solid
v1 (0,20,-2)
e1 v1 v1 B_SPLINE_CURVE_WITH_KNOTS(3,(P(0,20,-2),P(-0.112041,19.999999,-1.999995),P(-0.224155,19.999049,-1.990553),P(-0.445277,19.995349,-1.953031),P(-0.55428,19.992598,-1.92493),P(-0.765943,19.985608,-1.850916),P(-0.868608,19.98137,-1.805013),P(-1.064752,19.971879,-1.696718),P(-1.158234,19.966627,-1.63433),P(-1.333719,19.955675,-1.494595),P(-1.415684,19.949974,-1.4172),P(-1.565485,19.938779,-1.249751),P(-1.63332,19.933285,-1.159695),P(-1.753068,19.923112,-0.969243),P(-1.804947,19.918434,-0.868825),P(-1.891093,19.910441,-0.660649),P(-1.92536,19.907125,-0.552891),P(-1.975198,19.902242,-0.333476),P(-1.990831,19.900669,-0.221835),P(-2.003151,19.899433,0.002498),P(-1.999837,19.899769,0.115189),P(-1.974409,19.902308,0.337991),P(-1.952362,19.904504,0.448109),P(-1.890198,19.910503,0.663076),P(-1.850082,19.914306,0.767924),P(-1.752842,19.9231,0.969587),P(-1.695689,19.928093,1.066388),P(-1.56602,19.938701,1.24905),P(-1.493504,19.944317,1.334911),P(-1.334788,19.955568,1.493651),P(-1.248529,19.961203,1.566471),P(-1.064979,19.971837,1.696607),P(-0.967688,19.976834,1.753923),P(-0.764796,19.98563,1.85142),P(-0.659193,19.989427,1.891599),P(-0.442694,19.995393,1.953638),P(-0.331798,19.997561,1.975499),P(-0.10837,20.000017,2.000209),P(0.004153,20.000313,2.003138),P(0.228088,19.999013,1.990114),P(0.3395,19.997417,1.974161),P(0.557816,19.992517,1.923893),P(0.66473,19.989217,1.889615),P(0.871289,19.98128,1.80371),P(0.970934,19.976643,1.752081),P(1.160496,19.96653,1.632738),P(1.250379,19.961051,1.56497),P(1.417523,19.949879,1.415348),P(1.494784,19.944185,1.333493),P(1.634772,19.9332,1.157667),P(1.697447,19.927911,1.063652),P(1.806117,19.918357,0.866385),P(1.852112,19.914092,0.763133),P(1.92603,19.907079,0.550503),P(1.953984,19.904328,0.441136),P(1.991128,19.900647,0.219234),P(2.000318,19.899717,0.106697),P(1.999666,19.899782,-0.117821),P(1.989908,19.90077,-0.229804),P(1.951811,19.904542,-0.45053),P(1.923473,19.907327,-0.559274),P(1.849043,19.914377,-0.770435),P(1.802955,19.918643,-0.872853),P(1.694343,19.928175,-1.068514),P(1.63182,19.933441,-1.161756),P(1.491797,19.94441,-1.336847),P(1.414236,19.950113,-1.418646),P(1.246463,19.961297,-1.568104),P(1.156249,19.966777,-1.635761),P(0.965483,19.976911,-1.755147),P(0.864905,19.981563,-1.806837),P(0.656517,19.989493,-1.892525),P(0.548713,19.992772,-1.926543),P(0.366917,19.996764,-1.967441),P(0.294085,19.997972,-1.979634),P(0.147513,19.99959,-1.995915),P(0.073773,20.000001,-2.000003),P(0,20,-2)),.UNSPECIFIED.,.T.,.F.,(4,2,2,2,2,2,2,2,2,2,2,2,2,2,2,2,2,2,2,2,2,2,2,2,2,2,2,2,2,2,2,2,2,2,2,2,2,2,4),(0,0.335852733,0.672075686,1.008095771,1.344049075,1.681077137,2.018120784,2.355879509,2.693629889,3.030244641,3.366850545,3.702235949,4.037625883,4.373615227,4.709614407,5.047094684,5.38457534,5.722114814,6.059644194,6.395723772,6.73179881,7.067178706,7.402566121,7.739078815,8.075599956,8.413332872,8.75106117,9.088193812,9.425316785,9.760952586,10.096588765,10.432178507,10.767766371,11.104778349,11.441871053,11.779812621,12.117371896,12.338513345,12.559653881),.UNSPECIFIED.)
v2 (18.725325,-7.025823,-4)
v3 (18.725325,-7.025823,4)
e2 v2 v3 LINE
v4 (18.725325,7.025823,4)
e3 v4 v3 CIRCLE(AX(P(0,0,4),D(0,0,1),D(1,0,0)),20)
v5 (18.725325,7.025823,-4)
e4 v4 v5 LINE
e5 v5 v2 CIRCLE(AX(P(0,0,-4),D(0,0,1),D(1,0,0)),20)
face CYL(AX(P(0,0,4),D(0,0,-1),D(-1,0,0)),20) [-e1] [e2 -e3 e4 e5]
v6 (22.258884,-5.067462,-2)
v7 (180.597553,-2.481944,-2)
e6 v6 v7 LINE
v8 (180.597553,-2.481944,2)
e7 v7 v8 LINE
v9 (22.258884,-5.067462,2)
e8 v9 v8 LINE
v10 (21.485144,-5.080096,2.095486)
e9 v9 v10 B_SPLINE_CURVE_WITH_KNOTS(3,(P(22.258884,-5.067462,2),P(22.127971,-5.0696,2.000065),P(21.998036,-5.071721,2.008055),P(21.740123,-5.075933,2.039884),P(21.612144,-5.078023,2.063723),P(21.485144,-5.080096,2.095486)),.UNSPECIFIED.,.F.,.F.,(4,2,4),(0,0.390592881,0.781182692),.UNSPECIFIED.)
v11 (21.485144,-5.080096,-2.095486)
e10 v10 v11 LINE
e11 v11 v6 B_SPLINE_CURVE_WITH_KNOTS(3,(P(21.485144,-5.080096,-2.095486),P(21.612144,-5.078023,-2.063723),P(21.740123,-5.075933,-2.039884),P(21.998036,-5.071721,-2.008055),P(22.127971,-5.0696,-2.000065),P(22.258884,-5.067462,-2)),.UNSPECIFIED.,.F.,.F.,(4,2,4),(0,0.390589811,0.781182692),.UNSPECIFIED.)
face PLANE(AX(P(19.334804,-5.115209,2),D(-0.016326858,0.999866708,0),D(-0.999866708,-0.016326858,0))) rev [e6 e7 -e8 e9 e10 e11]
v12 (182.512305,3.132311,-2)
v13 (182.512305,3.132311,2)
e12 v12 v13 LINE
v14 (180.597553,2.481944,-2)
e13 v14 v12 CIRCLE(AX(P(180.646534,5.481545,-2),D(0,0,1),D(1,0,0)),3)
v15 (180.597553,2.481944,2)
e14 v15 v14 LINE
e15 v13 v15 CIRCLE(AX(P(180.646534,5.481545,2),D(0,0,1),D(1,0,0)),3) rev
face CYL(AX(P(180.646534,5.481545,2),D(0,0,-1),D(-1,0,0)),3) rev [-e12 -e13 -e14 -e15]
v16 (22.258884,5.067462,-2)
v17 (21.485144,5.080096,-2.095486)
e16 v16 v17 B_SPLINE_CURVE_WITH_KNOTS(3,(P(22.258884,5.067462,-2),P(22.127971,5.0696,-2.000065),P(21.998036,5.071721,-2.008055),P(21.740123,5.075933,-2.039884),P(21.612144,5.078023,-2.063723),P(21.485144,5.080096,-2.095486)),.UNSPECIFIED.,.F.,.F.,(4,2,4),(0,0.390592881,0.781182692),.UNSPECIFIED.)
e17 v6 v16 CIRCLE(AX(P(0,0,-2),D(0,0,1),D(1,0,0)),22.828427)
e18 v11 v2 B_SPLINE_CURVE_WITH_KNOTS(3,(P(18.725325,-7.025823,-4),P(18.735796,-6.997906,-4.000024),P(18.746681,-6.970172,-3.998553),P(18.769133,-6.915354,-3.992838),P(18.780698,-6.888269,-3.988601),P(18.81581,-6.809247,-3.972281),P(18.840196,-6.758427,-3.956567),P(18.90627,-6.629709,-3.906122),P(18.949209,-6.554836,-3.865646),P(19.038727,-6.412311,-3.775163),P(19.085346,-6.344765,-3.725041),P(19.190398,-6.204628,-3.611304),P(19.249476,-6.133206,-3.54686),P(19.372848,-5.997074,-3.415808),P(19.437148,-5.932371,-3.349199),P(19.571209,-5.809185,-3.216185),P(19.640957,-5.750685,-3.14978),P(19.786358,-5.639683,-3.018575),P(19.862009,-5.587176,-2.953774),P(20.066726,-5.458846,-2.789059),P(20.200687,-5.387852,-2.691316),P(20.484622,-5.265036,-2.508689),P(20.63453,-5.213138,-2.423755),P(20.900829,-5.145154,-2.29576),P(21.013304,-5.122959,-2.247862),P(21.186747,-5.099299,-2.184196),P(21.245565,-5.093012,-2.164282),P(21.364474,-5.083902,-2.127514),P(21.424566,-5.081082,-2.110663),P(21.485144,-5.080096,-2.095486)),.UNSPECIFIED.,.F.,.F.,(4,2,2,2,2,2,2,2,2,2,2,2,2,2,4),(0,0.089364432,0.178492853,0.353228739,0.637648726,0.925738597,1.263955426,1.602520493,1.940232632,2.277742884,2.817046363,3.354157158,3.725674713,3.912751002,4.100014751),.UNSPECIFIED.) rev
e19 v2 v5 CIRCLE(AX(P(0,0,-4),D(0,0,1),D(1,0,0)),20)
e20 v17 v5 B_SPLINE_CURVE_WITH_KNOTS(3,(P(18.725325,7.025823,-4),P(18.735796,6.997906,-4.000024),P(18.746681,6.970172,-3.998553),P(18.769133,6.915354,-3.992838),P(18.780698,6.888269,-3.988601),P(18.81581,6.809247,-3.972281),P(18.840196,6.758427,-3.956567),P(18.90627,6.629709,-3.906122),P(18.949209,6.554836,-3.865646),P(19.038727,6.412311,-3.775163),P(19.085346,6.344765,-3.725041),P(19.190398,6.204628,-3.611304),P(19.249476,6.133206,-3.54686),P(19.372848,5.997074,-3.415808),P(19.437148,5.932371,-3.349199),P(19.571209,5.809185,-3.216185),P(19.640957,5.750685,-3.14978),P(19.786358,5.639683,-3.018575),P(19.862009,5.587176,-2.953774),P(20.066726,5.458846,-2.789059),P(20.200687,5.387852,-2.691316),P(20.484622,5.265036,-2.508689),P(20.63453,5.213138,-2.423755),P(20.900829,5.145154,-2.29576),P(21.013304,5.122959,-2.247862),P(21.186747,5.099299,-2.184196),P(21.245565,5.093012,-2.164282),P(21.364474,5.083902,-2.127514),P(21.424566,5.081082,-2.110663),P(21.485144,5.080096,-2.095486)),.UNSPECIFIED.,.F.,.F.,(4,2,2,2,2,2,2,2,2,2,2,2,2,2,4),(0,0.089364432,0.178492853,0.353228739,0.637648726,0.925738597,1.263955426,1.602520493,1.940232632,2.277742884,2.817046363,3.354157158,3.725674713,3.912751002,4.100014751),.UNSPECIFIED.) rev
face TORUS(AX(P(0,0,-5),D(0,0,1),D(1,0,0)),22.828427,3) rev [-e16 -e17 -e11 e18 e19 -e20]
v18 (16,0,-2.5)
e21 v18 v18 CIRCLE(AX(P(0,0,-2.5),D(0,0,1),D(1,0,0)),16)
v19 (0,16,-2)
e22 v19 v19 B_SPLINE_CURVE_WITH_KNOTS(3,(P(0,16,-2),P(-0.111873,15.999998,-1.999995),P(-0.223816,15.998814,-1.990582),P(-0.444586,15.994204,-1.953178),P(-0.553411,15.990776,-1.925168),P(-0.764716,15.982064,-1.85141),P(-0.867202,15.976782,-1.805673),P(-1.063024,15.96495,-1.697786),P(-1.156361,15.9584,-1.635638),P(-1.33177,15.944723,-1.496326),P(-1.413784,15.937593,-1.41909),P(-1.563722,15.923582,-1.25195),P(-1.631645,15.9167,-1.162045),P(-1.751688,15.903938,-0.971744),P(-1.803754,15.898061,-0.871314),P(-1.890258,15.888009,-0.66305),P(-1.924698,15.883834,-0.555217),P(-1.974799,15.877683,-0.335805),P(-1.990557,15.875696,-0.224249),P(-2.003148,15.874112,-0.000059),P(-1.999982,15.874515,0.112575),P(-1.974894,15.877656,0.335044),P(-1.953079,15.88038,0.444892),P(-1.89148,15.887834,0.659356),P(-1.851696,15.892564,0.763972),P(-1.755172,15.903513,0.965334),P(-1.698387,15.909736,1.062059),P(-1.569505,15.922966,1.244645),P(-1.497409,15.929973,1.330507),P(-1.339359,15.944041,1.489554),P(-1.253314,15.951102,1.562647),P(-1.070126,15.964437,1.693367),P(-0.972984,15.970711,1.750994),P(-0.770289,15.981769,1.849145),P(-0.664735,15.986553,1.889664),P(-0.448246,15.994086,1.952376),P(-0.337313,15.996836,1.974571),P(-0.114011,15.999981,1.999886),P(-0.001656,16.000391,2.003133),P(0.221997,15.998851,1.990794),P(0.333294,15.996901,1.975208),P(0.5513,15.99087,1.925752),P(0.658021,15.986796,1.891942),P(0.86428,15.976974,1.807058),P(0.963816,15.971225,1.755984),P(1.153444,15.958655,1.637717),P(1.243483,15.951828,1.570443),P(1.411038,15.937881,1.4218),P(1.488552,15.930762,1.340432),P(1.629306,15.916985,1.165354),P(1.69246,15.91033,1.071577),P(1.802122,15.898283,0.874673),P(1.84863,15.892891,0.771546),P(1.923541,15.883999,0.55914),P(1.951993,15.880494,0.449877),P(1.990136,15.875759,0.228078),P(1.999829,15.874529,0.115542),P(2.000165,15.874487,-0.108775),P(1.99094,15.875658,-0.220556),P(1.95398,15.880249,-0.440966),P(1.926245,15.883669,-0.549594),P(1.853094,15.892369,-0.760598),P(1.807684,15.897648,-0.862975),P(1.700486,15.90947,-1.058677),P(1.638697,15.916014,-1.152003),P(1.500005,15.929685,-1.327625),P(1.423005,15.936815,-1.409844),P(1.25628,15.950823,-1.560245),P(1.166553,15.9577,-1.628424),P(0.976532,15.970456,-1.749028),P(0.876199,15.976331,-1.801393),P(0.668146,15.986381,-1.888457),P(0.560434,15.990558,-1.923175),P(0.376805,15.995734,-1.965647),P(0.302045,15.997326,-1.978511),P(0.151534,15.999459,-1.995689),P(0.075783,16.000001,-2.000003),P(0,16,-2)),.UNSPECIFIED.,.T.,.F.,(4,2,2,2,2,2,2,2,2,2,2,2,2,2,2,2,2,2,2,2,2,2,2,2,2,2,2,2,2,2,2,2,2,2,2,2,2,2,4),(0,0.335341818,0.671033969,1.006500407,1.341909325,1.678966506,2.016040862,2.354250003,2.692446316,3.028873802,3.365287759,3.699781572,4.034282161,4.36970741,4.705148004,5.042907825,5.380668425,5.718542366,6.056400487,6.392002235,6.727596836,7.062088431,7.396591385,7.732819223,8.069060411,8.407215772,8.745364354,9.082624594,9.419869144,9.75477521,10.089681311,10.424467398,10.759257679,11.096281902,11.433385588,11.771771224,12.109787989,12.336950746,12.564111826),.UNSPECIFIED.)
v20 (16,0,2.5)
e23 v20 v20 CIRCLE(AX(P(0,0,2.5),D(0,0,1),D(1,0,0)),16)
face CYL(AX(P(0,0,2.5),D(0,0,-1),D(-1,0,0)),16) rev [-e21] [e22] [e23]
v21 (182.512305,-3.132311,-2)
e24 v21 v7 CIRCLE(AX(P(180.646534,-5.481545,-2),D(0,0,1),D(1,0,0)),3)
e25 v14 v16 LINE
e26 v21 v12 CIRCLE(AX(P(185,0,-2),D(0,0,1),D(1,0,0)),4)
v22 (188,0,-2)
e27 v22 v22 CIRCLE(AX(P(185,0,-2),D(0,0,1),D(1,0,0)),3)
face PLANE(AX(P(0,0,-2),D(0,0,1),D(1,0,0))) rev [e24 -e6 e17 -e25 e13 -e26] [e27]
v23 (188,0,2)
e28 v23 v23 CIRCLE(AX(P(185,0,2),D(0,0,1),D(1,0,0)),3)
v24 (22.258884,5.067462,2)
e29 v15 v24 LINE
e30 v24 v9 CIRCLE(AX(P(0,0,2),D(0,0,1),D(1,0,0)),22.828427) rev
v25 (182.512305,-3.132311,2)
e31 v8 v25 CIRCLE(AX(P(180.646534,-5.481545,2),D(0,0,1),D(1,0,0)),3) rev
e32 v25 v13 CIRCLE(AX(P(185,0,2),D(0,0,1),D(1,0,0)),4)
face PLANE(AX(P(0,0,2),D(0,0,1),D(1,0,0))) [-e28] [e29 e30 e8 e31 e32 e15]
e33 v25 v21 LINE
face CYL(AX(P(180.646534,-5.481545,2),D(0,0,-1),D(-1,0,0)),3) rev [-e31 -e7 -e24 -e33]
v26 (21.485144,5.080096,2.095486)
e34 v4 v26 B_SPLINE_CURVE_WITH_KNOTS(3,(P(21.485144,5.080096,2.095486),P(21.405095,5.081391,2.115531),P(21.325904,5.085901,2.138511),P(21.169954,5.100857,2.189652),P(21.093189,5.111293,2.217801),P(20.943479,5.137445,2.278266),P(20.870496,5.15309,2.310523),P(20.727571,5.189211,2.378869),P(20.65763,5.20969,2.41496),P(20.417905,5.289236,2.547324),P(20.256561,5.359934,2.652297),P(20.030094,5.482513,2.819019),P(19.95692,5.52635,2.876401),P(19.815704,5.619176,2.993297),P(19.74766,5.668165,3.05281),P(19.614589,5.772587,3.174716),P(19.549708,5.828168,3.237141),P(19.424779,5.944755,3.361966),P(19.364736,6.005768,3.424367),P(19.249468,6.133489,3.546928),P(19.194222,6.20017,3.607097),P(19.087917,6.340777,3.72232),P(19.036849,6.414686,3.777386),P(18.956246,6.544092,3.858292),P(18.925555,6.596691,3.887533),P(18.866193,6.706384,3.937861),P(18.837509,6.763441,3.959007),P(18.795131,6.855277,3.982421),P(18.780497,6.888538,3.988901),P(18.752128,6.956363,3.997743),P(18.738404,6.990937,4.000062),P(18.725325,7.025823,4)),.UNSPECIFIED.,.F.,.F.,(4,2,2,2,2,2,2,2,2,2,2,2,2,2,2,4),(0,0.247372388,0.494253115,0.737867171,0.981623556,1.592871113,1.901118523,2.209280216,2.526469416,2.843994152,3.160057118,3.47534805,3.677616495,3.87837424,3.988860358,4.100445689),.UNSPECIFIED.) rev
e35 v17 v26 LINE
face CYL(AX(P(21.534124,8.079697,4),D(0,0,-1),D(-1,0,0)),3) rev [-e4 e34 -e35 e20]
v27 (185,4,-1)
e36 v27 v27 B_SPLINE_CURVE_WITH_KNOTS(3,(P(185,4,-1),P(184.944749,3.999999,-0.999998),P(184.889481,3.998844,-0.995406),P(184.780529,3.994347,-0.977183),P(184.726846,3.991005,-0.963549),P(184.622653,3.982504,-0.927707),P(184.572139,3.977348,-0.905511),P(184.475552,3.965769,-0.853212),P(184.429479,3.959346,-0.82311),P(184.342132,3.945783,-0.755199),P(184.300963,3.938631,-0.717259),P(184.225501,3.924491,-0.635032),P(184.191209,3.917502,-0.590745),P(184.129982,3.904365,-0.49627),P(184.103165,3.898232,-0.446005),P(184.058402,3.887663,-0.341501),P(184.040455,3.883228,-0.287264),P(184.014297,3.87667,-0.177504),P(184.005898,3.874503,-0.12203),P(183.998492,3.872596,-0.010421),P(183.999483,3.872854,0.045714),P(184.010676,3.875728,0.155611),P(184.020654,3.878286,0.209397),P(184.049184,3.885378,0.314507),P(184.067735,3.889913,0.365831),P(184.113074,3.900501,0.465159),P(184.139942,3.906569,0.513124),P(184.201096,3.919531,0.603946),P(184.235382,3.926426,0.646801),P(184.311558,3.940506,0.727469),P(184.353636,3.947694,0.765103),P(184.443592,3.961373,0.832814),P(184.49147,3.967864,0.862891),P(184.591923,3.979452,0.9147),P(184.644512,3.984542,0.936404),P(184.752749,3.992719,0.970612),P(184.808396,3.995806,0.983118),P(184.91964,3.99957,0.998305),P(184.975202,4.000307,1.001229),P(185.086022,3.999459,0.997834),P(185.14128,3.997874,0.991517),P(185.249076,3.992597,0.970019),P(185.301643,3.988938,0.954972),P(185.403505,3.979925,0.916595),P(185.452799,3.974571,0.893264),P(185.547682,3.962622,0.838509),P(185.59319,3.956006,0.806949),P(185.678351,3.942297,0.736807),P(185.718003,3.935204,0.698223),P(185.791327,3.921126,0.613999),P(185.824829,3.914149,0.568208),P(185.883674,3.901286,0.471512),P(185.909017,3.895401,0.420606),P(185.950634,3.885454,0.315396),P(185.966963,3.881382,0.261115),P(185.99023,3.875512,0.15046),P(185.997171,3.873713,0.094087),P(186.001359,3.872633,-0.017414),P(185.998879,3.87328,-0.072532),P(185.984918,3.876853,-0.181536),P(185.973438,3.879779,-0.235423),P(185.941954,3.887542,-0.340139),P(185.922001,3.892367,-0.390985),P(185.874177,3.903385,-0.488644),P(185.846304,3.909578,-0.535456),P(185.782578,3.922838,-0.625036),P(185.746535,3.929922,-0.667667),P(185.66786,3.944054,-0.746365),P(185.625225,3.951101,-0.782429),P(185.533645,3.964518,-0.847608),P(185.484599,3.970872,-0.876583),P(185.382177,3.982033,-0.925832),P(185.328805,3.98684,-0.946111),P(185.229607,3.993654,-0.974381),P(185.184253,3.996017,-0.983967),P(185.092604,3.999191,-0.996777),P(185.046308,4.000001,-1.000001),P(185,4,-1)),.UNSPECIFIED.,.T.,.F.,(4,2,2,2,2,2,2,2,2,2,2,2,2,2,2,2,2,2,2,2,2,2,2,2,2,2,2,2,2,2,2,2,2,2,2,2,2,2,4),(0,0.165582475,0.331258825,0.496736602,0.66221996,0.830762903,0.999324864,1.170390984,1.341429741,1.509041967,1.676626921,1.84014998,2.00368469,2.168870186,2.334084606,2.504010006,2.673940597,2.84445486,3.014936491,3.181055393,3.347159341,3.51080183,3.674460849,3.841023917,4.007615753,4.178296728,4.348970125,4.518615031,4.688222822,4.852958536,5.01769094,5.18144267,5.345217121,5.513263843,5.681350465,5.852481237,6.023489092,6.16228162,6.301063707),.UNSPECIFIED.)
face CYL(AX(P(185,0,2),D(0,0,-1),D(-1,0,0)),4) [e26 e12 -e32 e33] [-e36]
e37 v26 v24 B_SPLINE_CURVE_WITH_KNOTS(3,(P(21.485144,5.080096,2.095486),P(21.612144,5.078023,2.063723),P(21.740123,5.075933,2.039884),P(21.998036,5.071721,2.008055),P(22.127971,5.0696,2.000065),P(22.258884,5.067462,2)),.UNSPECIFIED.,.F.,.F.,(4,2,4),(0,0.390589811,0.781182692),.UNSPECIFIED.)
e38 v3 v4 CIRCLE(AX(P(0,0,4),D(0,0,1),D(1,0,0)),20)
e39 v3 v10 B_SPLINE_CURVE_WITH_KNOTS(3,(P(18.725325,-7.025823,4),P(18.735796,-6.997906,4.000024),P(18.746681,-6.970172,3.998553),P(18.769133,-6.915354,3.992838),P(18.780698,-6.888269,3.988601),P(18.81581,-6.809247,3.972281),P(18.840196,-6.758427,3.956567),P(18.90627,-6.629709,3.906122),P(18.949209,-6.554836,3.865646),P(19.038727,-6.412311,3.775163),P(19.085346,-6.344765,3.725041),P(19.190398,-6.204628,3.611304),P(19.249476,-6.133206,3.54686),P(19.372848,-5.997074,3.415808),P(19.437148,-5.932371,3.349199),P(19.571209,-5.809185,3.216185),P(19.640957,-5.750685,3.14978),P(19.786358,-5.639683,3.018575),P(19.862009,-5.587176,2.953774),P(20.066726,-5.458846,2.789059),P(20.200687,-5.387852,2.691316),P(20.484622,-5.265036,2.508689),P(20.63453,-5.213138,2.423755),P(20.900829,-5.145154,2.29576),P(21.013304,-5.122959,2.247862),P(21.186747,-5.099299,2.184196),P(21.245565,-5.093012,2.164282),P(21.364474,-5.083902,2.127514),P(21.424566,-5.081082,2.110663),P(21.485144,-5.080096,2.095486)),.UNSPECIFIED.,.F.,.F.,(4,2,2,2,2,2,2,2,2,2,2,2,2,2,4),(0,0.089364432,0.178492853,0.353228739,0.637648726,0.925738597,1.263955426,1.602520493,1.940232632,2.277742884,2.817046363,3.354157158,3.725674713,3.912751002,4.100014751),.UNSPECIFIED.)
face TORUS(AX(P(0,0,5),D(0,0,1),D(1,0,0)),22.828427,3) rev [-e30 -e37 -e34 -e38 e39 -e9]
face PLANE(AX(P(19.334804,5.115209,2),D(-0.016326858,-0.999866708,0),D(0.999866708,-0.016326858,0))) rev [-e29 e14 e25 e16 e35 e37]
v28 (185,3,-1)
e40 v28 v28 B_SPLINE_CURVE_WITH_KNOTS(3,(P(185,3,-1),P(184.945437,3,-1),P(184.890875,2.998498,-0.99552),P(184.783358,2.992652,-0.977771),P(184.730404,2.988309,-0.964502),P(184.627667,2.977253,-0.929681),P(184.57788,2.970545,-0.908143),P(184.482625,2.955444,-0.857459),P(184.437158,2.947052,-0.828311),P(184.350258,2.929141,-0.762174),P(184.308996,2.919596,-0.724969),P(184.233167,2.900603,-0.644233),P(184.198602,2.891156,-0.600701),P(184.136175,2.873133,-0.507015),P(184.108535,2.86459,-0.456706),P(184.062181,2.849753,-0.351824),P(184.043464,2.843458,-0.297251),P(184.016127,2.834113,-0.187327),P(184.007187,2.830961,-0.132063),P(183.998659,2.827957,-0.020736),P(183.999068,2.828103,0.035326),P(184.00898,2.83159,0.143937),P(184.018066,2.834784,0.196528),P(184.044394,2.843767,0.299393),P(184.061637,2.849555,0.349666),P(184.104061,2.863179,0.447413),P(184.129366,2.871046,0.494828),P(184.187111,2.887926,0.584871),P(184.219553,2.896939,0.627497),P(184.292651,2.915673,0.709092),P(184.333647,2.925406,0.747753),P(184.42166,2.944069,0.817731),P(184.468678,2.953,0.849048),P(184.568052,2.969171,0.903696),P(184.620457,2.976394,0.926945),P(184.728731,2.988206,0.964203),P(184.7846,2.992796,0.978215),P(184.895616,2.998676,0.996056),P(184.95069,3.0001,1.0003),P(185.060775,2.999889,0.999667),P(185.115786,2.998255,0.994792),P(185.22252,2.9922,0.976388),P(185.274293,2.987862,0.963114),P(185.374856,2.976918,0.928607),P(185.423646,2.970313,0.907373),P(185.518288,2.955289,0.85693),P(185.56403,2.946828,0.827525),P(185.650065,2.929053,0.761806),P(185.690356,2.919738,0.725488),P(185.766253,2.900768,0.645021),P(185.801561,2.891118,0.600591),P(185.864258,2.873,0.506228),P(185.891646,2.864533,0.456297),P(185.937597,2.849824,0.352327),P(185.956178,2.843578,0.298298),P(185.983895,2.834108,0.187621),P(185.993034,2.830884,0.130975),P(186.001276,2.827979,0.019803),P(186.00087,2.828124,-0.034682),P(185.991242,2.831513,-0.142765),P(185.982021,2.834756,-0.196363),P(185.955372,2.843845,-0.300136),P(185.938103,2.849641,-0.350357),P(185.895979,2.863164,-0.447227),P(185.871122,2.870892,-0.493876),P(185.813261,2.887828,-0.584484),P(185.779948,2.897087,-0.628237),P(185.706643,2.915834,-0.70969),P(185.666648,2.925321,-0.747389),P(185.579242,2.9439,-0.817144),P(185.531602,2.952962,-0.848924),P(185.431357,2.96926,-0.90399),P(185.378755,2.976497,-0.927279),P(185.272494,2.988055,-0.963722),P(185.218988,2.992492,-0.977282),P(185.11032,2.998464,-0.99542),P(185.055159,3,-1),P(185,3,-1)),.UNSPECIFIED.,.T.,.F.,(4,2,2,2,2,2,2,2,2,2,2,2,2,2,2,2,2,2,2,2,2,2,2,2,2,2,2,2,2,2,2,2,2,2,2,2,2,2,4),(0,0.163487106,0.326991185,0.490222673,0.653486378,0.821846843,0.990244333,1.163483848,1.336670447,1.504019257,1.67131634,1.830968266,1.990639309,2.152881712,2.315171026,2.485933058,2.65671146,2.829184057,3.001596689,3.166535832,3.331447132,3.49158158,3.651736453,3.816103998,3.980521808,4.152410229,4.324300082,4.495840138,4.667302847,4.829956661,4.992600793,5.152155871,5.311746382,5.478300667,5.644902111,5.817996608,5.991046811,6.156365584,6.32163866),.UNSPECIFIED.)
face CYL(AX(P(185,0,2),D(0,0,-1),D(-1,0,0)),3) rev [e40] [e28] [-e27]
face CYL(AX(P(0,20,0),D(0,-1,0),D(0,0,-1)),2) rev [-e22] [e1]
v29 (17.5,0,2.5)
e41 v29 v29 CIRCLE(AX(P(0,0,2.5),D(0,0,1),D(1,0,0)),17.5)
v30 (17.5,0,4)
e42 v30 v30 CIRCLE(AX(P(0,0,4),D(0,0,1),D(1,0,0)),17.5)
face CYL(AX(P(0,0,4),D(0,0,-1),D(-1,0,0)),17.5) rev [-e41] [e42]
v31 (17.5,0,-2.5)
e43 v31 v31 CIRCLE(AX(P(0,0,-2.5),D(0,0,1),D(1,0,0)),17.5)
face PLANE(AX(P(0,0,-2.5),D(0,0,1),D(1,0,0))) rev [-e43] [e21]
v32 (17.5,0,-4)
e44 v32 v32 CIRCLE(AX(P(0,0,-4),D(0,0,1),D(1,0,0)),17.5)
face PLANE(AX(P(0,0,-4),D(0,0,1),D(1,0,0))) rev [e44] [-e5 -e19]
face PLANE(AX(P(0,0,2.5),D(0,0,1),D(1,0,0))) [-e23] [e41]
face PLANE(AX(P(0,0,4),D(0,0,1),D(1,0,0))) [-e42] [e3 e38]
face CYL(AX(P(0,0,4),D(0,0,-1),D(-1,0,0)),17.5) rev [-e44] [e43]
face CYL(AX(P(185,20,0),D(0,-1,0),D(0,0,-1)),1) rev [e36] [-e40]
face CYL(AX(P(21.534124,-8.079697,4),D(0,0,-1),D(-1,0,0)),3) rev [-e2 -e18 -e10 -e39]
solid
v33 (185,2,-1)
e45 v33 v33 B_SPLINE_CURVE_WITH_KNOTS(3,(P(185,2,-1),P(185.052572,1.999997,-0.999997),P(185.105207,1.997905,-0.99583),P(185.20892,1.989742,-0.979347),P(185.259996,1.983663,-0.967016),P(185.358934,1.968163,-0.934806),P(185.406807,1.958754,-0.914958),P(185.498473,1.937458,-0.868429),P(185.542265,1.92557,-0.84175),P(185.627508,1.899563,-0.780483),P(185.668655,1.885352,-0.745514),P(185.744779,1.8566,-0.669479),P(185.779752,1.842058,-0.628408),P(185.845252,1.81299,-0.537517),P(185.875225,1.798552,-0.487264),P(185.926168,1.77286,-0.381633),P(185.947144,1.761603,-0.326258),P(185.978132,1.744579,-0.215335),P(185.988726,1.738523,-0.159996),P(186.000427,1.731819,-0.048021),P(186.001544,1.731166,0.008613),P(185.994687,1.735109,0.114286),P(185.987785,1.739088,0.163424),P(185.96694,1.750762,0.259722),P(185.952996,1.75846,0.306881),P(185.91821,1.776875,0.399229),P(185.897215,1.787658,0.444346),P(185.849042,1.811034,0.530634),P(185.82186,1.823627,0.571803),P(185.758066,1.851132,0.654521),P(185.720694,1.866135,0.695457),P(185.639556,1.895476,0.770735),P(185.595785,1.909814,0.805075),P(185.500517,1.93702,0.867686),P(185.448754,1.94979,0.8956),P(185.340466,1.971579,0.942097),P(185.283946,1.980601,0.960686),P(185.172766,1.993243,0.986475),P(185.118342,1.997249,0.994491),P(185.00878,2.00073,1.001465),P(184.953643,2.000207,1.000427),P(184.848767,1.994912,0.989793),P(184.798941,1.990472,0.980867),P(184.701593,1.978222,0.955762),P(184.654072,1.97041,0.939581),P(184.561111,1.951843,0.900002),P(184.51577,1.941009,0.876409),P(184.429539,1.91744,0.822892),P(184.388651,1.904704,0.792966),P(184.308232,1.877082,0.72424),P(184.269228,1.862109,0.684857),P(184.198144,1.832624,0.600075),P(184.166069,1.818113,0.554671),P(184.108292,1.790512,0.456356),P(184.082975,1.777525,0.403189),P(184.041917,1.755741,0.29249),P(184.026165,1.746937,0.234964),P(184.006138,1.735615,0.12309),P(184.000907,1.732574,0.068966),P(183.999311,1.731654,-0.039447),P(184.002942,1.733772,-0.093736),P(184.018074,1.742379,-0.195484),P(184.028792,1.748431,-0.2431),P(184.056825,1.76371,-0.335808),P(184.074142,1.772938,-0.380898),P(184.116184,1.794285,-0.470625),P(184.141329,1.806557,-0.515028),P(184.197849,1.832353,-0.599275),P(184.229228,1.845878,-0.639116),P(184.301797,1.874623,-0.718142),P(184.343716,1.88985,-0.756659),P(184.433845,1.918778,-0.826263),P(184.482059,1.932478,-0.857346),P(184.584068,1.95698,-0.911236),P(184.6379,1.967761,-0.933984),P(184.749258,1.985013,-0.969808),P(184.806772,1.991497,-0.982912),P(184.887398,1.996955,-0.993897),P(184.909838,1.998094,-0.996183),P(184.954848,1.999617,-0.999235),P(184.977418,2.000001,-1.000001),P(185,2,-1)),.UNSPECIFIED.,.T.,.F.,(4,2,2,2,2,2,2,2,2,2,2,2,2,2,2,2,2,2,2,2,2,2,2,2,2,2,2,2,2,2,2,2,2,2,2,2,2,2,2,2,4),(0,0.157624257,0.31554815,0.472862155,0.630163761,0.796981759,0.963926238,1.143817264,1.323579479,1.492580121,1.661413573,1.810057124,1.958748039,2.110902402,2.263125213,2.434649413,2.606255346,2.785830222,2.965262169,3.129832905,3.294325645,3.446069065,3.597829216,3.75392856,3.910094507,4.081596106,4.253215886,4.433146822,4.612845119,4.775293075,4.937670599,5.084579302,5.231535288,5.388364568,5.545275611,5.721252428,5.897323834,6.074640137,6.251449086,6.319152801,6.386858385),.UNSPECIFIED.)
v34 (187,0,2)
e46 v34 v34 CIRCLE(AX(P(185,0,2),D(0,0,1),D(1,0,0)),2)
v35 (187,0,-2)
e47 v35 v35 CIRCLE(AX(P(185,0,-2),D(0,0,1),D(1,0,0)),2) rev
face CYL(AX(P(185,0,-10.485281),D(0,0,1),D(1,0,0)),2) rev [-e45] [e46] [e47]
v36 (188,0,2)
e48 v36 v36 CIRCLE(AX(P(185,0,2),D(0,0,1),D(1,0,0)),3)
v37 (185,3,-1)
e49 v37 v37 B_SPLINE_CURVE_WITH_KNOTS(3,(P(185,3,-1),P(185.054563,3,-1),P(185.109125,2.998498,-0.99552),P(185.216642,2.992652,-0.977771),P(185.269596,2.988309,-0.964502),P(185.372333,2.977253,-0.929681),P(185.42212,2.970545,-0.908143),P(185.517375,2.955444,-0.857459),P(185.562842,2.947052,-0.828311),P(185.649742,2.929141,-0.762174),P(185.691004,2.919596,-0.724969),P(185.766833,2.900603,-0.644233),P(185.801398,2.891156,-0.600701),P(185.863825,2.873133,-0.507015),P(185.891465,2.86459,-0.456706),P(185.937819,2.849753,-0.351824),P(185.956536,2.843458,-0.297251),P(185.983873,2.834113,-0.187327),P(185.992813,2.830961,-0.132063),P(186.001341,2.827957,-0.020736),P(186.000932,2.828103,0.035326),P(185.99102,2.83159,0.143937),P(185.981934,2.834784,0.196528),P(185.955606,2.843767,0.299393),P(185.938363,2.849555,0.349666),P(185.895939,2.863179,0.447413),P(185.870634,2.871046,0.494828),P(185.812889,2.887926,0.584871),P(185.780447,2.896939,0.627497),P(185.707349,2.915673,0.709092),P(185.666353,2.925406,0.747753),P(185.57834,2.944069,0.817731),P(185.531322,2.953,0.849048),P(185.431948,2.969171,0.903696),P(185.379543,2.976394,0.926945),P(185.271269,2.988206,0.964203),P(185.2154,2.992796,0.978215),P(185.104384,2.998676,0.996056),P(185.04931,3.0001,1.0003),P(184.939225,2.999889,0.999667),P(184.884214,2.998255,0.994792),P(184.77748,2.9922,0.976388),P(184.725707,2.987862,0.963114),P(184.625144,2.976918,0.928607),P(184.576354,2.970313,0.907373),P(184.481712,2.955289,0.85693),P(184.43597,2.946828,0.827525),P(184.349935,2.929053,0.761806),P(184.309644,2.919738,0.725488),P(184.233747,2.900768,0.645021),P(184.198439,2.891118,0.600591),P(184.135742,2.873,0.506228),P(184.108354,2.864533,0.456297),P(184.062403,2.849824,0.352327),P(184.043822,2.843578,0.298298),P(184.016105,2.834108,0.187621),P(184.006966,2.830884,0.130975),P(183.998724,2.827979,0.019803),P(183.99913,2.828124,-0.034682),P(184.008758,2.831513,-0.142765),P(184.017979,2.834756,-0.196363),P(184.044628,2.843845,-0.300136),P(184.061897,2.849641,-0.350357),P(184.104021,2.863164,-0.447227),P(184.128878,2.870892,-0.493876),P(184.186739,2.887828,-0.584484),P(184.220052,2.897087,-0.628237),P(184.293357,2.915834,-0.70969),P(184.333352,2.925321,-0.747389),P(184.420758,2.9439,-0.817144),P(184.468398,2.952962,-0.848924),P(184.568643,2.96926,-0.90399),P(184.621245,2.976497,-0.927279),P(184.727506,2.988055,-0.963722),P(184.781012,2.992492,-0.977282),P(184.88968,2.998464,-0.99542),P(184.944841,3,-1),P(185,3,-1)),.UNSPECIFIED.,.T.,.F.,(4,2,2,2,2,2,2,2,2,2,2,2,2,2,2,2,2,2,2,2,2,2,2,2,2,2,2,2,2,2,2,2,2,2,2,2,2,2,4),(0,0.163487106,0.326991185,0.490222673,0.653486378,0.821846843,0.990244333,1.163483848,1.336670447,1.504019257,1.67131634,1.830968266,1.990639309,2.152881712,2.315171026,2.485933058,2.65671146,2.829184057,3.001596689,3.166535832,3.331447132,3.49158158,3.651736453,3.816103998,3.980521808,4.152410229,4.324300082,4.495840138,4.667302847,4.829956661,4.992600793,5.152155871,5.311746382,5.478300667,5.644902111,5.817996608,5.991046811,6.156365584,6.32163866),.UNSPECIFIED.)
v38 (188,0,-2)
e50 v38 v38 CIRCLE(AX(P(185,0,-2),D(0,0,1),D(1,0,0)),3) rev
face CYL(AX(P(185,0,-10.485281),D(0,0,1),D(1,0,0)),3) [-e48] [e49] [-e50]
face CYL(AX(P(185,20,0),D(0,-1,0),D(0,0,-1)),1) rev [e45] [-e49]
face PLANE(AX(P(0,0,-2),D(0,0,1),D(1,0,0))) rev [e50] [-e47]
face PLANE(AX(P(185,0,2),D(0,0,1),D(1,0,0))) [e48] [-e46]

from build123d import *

# Parameters (mm, degrees)
SKETCH1_R           = 20
SKETCH1_R_2         = 17.5
BOSS_EXTRUDE1_DEPTH = 4
SKETCH2_R           = 4
SKETCH2_R_2         = 3
BOSS_EXTRUDE2_DEPTH = 2
BOSS_EXTRUDE3_DEPTH = 2
FILLET2_R           = 3
SKETCH4_R           = 17.5
SKETCH4_R_2         = 16
BOSS_EXTRUDE4_DEPTH = 2.5
SKETCH5_R           = 3
SKETCH5_R_2         = 2
BOSS_EXTRUDE5_DEPTH = 4
SKETCH6_R           = 2
SKETCH6_R_2         = 1
CUT_EXTRUDE1_DEPTH  = 191.097343487


with BuildPart() as part:
    # Sketch1 → Boss-Extrude1 (new, symmetric)
    with BuildSketch(Plane.XY):
        Circle(SKETCH1_R)
        Circle(SKETCH1_R_2, mode=Mode.SUBTRACT)
    extrude(amount=BOSS_EXTRUDE1_DEPTH, both=True)



with BuildPart() as body_2:
    # Sketch2 → Boss-Extrude2 (new, symmetric)
    with BuildSketch(Plane.XY):
        with Locations((185, 0)):
            Circle(SKETCH2_R)
        with Locations((185, 0)):
            Circle(SKETCH2_R_2, mode=Mode.SUBTRACT)
    extrude(amount=BOSS_EXTRUDE2_DEPTH, both=True)


with BuildPart() as part_1:
    add(part.part)

    add(body_2.part)  # Boss-Extrude3 merges body 2
    # Sketch3 → Boss-Extrude3 (add, symmetric)
    with BuildSketch(Plane.XY):
        with BuildLine():
            Line((19.334803677, 5.115209357), (181.847093747, 2.461540607))
            ThreePointArc((181.847093747, 2.461540607), (181, 0), (181.847093747, -2.461540607))
            Line((181.847093747, -2.461540607), (19.334803677, -5.115209357))
            ThreePointArc((19.334803677, -5.115209357), (20, 0), (19.334803677, 5.115209357))
        make_face()
    extrude(amount=BOSS_EXTRUDE3_DEPTH, both=True)

    # Fillet2
    # the kernel refuses this fillet: 3 mm, written as the material it adds along each edge
    with BuildSketch(Plane(origin=(0, 0, -2), x_dir=(1, 0, 0), z_dir=(0, -1, 0))) as fillet2_piece_1_section:
        with BuildLine():
            CenterArc((22.828427125, -3), FILLET2_R, 90, 70.528779366)
            Line((22.828427125, 0), (22.828427125, 0.06))
            Line((22.828427125, 0.06), (20, 0.06))
            Line((20, 0.06), (19.94, 0))
            ThreePointArc((19.94, 0), (19.94, -1), (19.943431458, -1.98))
            Line((19.943431458, -1.98), (20, -2))
        make_face()
    fillet2_piece_1 = revolve(axis=Axis((0, 0, -2), (0, 0, 1)), revolution_arc=35.075988766, mode=Mode.PRIVATE)
    fillet2_piece_1 = split(fillet2_piece_1, bisect_by=Plane(origin=(20.50402636, 5.09611708, -2.514287823), z_dir=(-0.01632685771654534, -0.99986670797517, 0)), keep=Keep.TOP, mode=Mode.PRIVATE)
    add(fillet2_piece_1)
    with BuildSketch(Plane(origin=(19.334803677, 5.115209357, 2), x_dir=(0.99986670797517, -0.01632685771654477, 0), z_dir=(0, 0, -1))) as fillet2_piece_2:
        with BuildLine():
            CenterArc((2.150626595, -3), FILLET2_R, 90, 68.498190281)
            Line((-0.640591379, -1.900408157), (-0.696415739, -1.87841632))
            ThreePointArc((-0.696415739, -1.87841632), (-0.353317386, -0.939073094), (-0.057746134, 0.016290612))
            Line((-0.057746134, 0.016290612), (0, 0.06))
            Line((0, 0.06), (2.150626595, 0.06))
            Line((2.150626595, 0.06), (2.150626595, 0))
        make_face()
    extrude(amount=4)
    with BuildSketch(Plane(origin=(19.334803677, -5.115209357, -2), x_dir=(-0.3039080161751765, -0.9527013790818551, 0), z_dir=(0, 0, 1))) as fillet2_piece_3:
        with BuildLine():
            CenterArc((2.155879863, 2.996227088), FILLET2_R, 198.627981215, 68.498190281)
            Line((-0.686957722, 2.037960706), (-0.743814474, 2.018795378))
            Line((-0.743814474, 2.018795378), (-0.056856752, -0.019165328))
            Line((-0.056856752, -0.019165328), (0.003008204, -0.059924542))
            ThreePointArc((0.003008204, -0.059924542), (1.00273482, -0.034847255), (2.002461436, -0.059924542))
            Line((2.002461436, -0.059924542), (2.00546964, 0))
        make_face()
    extrude(amount=4)
    with BuildSketch(Plane(origin=(181.847093747, -2.461540607, -2), x_dir=(0.7041582236338697, -0.7100430945293342, 0), z_dir=(0, 0, 1)), Plane(origin=(181.847093747, 2.461540607, 2), x_dir=(0.7041582236338706, 0.7100430945293335, 0), z_dir=(0, 0, -1))) as fillet2_piece_4:
        with BuildLine():
            CenterArc((1.298948631, -2.97901003), FILLET2_R, 96.781666847, 39.392256485)
            Line((-0.865386796, -0.901595253), (-0.908673505, -0.860046958))
            Line((-0.908673505, -0.860046958), (-0.043286709, 0.041548296))
            Line((-0.043286709, 0.041548296), (0.007085174, 0.059580201))
            ThreePointArc((0.007085174, 0.059580201), (0.472344957, 0.032013374), (0.937604739, 0.059580201))
            Line((0.937604739, 0.059580201), (0.944689914, 0))
        make_face()
    extrude(amount=4)
    with BuildSketch(Plane(origin=(0, 0, 2), x_dir=(1, 0, 0), z_dir=(0, -1, 0))) as fillet2_piece_5_section:
        with BuildLine():
            CenterArc((22.828427125, 3), FILLET2_R, 199.471220634, 70.528779366)
            Line((22.828427125, 0), (22.828427125, -0.06))
            Line((22.828427125, -0.06), (20, -0.06))
            Line((20, -0.06), (19.94, 0))
            ThreePointArc((19.94, 0), (19.94, 1), (19.943431458, 1.98))
            Line((19.943431458, 1.98), (20, 2))
        make_face()
    fillet2_piece_5 = revolve(axis=Axis((0, 0, 2), (0, 0, 1)), revolution_arc=35.075988766, mode=Mode.PRIVATE)
    fillet2_piece_5 = split(fillet2_piece_5, bisect_by=Plane(origin=(20.50402636, 5.09611708, 2.514287823), z_dir=(-0.01632685771654534, -0.99986670797517, 0)), keep=Keep.TOP, mode=Mode.PRIVATE)
    add(fillet2_piece_5)
    with BuildSketch(Plane(origin=(0, 0, 2), x_dir=(0.8183906159507496, -0.574662335396842, 0), z_dir=(-0.574662335396842, -0.8183906159507496, 0))) as fillet2_piece_6_section:
        with BuildLine():
            CenterArc((22.828427125, 3), FILLET2_R, 199.471220634, 70.528779366)
            Line((22.828427125, 0), (22.828427125, -0.06))
            Line((22.828427125, -0.06), (20, -0.06))
            Line((20, -0.06), (19.94, 0))
            ThreePointArc((19.94, 0), (19.94, 1), (19.943431458, 1.98))
            Line((19.943431458, 1.98), (20, 2))
        make_face()
    fillet2_piece_6 = revolve(axis=Axis((0, 0, 2), (0, 0, 1)), revolution_arc=35.075988766, mode=Mode.PRIVATE)
    fillet2_piece_6 = split(fillet2_piece_6, bisect_by=Plane(origin=(20.504025944, -5.096117086, 2.514287966), z_dir=(-0.01632685771654534, 0.99986670797517, 0)), keep=Keep.TOP, mode=Mode.PRIVATE)
    add(fillet2_piece_6)
    with BuildSketch(Plane(origin=(0, 0, -2), x_dir=(0.8183906159507496, -0.574662335396842, 0), z_dir=(-0.574662335396842, -0.8183906159507496, 0))) as fillet2_piece_7_section:
        with BuildLine():
            CenterArc((22.828427125, -3), FILLET2_R, 90, 70.528779366)
            Line((22.828427125, 0), (22.828427125, 0.06))
            Line((22.828427125, 0.06), (20, 0.06))
            Line((20, 0.06), (19.94, 0))
            ThreePointArc((19.94, 0), (19.94, -1), (19.943431458, -1.98))
            Line((19.943431458, -1.98), (20, -2))
        make_face()
    fillet2_piece_7 = revolve(axis=Axis((0, 0, -2), (0, 0, 1)), revolution_arc=35.075988766, mode=Mode.PRIVATE)
    fillet2_piece_7 = split(fillet2_piece_7, bisect_by=Plane(origin=(20.504025944, -5.096117086, -2.514287966), z_dir=(-0.01632685771654534, 0.99986670797517, 0)), keep=Keep.TOP, mode=Mode.PRIVATE)
    add(fillet2_piece_7)
    with BuildSketch(Plane(origin=(19.334803677, 5.115209357, 2), x_dir=(0.99986670797517, -0.01632685771654477, 0), z_dir=(0, 0, -1))) as fillet2_piece_8a_section:
        with BuildLine():
            CenterArc((2.150626595, -3), FILLET2_R, 90, 68.498190281)
            Line((-0.640591379, -1.900408157), (-0.696415739, -1.87841632))
            ThreePointArc((-0.696415739, -1.87841632), (-0.353317386, -0.939073094), (-0.057746134, 0.016290612))
            Line((-0.057746134, 0.016290612), (0, 0.06))
            Line((0, 0.06), (2.150626595, 0.06))
            Line((2.150626595, 0.06), (2.150626595, 0))
        make_face()
    fillet2_piece_8a = extrude(amount=9.376566487, mode=Mode.PRIVATE)
    fillet2_piece_8a = split(fillet2_piece_8a, bisect_by=Plane(origin=(19.695390581, 5.526512095, -2), z_dir=(0, 0, -1)), keep=Keep.TOP, mode=Mode.PRIVATE)
    fillet2_piece_8a = split(fillet2_piece_8a, bisect_by=Plane(origin=(19.695390581, 5.526512095, -4), z_dir=(0, 0, 1)), keep=Keep.TOP, mode=Mode.PRIVATE)
    with BuildSketch(Plane(origin=(0, 0, -2), x_dir=(1, 0, 0), z_dir=(0, -1, 0))) as fillet2_piece_8b_section:
        with BuildLine():
            CenterArc((22.828427125, -3), FILLET2_R, 90, 70.528779366)
            Line((22.828427125, 0), (22.828427125, 0.06))
            Line((22.828427125, 0.06), (20, 0.06))
            Line((20, 0.06), (19.94, 0))
            ThreePointArc((19.94, 0), (19.94, -1), (19.943431458, -1.98))
            Line((19.943431458, -1.98), (20, -2))
        make_face()
    fillet2_piece_8b = revolve(axis=Axis((0, 0, -2), (0, 0, 1)), revolution_arc=35.075988766, mode=Mode.PRIVATE)
    fillet2_piece_8b = split(fillet2_piece_8b, bisect_by=Plane(origin=(18.660284546, 5.126223603, -2.498924184), z_dir=(0.01632685771654534, 0.99986670797517, 0)), keep=Keep.TOP, mode=Mode.PRIVATE)
    fillet2_piece_8 = fillet2_piece_8a & fillet2_piece_8b
    add(fillet2_piece_8)
    with BuildSketch(Plane(origin=(19.334803677, 5.115209357, 7.376566487), x_dir=(0.99986670797517, -0.016326857716544716, 0), z_dir=(0, 0, -1))) as fillet2_piece_9a_section:
        with BuildLine():
            CenterArc((2.150626595, -3), FILLET2_R, 90, 68.498190281)
            Line((-0.640591379, -1.900408157), (-0.696415739, -1.87841632))
            ThreePointArc((-0.696415739, -1.87841632), (-0.353317386, -0.939073094), (-0.057746134, 0.016290612))
            Line((-0.057746134, 0.016290612), (0, 0.06))
            Line((0, 0.06), (2.150626595, 0.06))
            Line((2.150626595, 0.06), (2.150626595, 0))
        make_face()
    fillet2_piece_9a = extrude(amount=9.376566487, mode=Mode.PRIVATE)
    fillet2_piece_9a = split(fillet2_piece_9a, bisect_by=Plane(origin=(19.695390581, 5.526512095, 2), z_dir=(0, 0, 1)), keep=Keep.TOP, mode=Mode.PRIVATE)
    fillet2_piece_9a = split(fillet2_piece_9a, bisect_by=Plane(origin=(19.695390581, 5.526512095, 4), z_dir=(0, 0, -1)), keep=Keep.TOP, mode=Mode.PRIVATE)
    with BuildSketch(Plane(origin=(0, 0, 2), x_dir=(1, 0, 0), z_dir=(0, -1, 0))) as fillet2_piece_9b_section:
        with BuildLine():
            CenterArc((22.828427125, 3), FILLET2_R, 199.471220634, 70.528779366)
            Line((22.828427125, 0), (22.828427125, -0.06))
            Line((22.828427125, -0.06), (20, -0.06))
            Line((20, -0.06), (19.94, 0))
            ThreePointArc((19.94, 0), (19.94, 1), (19.943431458, 1.98))
            Line((19.943431458, 1.98), (20, 2))
        make_face()
    fillet2_piece_9b = revolve(axis=Axis((0, 0, 2), (0, 0, 1)), revolution_arc=35.075988766, mode=Mode.PRIVATE)
    fillet2_piece_9b = split(fillet2_piece_9b, bisect_by=Plane(origin=(18.660284546, 5.126223603, 2.498924184), z_dir=(0.01632685771654534, 0.99986670797517, 0)), keep=Keep.TOP, mode=Mode.PRIVATE)
    fillet2_piece_9 = fillet2_piece_9a & fillet2_piece_9b
    add(fillet2_piece_9)
    with BuildSketch(Plane(origin=(19.334803677, -5.115209357, -7.376566487), x_dir=(-0.303908016175173, -0.9527013790818563, 0), z_dir=(0, 0, 1))) as fillet2_piece_10a_section:
        with BuildLine():
            CenterArc((2.155879863, 2.996227088), FILLET2_R, 198.627981215, 68.498190281)
            Line((-0.686957722, 2.037960706), (-0.743814474, 2.018795378))
            Line((-0.743814474, 2.018795378), (-0.056856752, -0.019165328))
            Line((-0.056856752, -0.019165328), (0.003008204, -0.059924542))
            ThreePointArc((0.003008204, -0.059924542), (1.00273482, -0.034847255), (2.002461436, -0.059924542))
            Line((2.002461436, -0.059924542), (2.00546964, 0))
        make_face()
    fillet2_piece_10a = extrude(amount=9.376566487, mode=Mode.PRIVATE)
    fillet2_piece_10a = split(fillet2_piece_10a, bisect_by=Plane(origin=(19.695390581, -5.526512095, -4), z_dir=(0, 0, 1)), keep=Keep.TOP, mode=Mode.PRIVATE)
    fillet2_piece_10a = split(fillet2_piece_10a, bisect_by=Plane(origin=(19.695390581, -5.526512095, -2), z_dir=(0, 0, -1)), keep=Keep.TOP, mode=Mode.PRIVATE)
    with BuildSketch(Plane(origin=(0, 0, -2), x_dir=(0.8183906159507496, -0.574662335396842, 0), z_dir=(-0.574662335396842, -0.8183906159507496, 0))) as fillet2_piece_10b_section:
        with BuildLine():
            CenterArc((22.828427125, -3), FILLET2_R, 90, 70.528779366)
            Line((22.828427125, 0), (22.828427125, 0.06))
            Line((22.828427125, 0.06), (20, 0.06))
            Line((20, 0.06), (19.94, 0))
            ThreePointArc((19.94, 0), (19.94, -1), (19.943431458, -1.98))
            Line((19.943431458, -1.98), (20, -2))
        make_face()
    fillet2_piece_10b = revolve(axis=Axis((0, 0, -2), (0, 0, 1)), revolution_arc=35.075988766, mode=Mode.PRIVATE)
    fillet2_piece_10b = split(fillet2_piece_10b, bisect_by=Plane(origin=(18.660284792, -5.126223599, -2.498924133), z_dir=(0.01632685771654534, -0.99986670797517, 0)), keep=Keep.TOP, mode=Mode.PRIVATE)
    fillet2_piece_10 = fillet2_piece_10a & fillet2_piece_10b
    add(fillet2_piece_10)
    with BuildSketch(Plane(origin=(0, 0, 2), x_dir=(0.8183906159507496, -0.574662335396842, 0), z_dir=(-0.574662335396842, -0.8183906159507496, 0))) as fillet2_piece_11a_section:
        with BuildLine():
            CenterArc((22.828427125, 3), FILLET2_R, 199.471220634, 70.528779366)
            Line((22.828427125, 0), (22.828427125, -0.06))
            Line((22.828427125, -0.06), (20, -0.06))
            Line((20, -0.06), (19.94, 0))
            ThreePointArc((19.94, 0), (19.94, 1), (19.943431458, 1.98))
            Line((19.943431458, 1.98), (20, 2))
        make_face()
    fillet2_piece_11a = revolve(axis=Axis((0, 0, 2), (0, 0, 1)), revolution_arc=35.075988766, mode=Mode.PRIVATE)
    fillet2_piece_11a = split(fillet2_piece_11a, bisect_by=Plane(origin=(18.660284792, -5.126223599, 2.498924133), z_dir=(0.01632685771654534, -0.99986670797517, 0)), keep=Keep.TOP, mode=Mode.PRIVATE)
    with BuildSketch(Plane(origin=(19.334803677, -5.115209357, -2), x_dir=(-0.3039080161751765, -0.9527013790818551, 0), z_dir=(0, 0, 1))) as fillet2_piece_11b_section:
        with BuildLine():
            CenterArc((2.155879863, 2.996227088), FILLET2_R, 198.627981215, 68.498190281)
            Line((-0.686957722, 2.037960706), (-0.743814474, 2.018795378))
            Line((-0.743814474, 2.018795378), (-0.056856752, -0.019165328))
            Line((-0.056856752, -0.019165328), (0.003008204, -0.059924542))
            ThreePointArc((0.003008204, -0.059924542), (1.00273482, -0.034847255), (2.002461436, -0.059924542))
            Line((2.002461436, -0.059924542), (2.00546964, 0))
        make_face()
    fillet2_piece_11b = extrude(amount=9.376566487, mode=Mode.PRIVATE)
    fillet2_piece_11b = split(fillet2_piece_11b, bisect_by=Plane(origin=(19.695390581, -5.526512095, 4), z_dir=(0, 0, -1)), keep=Keep.TOP, mode=Mode.PRIVATE)
    fillet2_piece_11b = split(fillet2_piece_11b, bisect_by=Plane(origin=(19.695390581, -5.526512095, 2), z_dir=(0, 0, 1)), keep=Keep.TOP, mode=Mode.PRIVATE)
    fillet2_piece_11 = fillet2_piece_11a & fillet2_piece_11b
    add(fillet2_piece_11)

    # Sketch4 → Boss-Extrude4 (add, symmetric)
    with BuildSketch(Plane.XY):
        Circle(SKETCH4_R)
        Circle(SKETCH4_R_2, mode=Mode.SUBTRACT)
    extrude(amount=BOSS_EXTRUDE4_DEPTH, both=True)


with BuildPart() as body_2_2:
    # Sketch5 → Boss-Extrude5 (new body)
    with BuildSketch(Plane.XY.offset(2)):
        with Locations((185, 0)):
            Circle(SKETCH5_R)
        with Locations((185, 0)):
            Circle(SKETCH5_R_2, mode=Mode.SUBTRACT)
    extrude(amount=-BOSS_EXTRUDE5_DEPTH)


with BuildPart() as cut_extrude1_tool:
    # Sketch6 → Cut-Extrude1 (new, through all)
    with BuildSketch(Plane(origin=(0, 0, 0), x_dir=(1, 0, 0), z_dir=(0, 1, 0))):
        with Locations(Location((0, 0, 0), (0, 0, 90))):
            Circle(SKETCH6_R)
        with Locations(Location((185, 0, 0), (0, 0, 90))):
            Circle(SKETCH6_R_2)
    extrude(amount=CUT_EXTRUDE1_DEPTH)


with BuildPart() as part_2:
    add(part_1.part)

    # Cut-Extrude1: cut by cut_extrude1_tool
    add(cut_extrude1_tool.part, mode=Mode.SUBTRACT)


with BuildPart() as body_2_2_1:
    add(body_2_2.part)

    # Cut-Extrude1: cut by cut_extrude1_tool
    add(cut_extrude1_tool.part, mode=Mode.SUBTRACT)


solid = Compound([part_2.part, body_2_2_1.part])
